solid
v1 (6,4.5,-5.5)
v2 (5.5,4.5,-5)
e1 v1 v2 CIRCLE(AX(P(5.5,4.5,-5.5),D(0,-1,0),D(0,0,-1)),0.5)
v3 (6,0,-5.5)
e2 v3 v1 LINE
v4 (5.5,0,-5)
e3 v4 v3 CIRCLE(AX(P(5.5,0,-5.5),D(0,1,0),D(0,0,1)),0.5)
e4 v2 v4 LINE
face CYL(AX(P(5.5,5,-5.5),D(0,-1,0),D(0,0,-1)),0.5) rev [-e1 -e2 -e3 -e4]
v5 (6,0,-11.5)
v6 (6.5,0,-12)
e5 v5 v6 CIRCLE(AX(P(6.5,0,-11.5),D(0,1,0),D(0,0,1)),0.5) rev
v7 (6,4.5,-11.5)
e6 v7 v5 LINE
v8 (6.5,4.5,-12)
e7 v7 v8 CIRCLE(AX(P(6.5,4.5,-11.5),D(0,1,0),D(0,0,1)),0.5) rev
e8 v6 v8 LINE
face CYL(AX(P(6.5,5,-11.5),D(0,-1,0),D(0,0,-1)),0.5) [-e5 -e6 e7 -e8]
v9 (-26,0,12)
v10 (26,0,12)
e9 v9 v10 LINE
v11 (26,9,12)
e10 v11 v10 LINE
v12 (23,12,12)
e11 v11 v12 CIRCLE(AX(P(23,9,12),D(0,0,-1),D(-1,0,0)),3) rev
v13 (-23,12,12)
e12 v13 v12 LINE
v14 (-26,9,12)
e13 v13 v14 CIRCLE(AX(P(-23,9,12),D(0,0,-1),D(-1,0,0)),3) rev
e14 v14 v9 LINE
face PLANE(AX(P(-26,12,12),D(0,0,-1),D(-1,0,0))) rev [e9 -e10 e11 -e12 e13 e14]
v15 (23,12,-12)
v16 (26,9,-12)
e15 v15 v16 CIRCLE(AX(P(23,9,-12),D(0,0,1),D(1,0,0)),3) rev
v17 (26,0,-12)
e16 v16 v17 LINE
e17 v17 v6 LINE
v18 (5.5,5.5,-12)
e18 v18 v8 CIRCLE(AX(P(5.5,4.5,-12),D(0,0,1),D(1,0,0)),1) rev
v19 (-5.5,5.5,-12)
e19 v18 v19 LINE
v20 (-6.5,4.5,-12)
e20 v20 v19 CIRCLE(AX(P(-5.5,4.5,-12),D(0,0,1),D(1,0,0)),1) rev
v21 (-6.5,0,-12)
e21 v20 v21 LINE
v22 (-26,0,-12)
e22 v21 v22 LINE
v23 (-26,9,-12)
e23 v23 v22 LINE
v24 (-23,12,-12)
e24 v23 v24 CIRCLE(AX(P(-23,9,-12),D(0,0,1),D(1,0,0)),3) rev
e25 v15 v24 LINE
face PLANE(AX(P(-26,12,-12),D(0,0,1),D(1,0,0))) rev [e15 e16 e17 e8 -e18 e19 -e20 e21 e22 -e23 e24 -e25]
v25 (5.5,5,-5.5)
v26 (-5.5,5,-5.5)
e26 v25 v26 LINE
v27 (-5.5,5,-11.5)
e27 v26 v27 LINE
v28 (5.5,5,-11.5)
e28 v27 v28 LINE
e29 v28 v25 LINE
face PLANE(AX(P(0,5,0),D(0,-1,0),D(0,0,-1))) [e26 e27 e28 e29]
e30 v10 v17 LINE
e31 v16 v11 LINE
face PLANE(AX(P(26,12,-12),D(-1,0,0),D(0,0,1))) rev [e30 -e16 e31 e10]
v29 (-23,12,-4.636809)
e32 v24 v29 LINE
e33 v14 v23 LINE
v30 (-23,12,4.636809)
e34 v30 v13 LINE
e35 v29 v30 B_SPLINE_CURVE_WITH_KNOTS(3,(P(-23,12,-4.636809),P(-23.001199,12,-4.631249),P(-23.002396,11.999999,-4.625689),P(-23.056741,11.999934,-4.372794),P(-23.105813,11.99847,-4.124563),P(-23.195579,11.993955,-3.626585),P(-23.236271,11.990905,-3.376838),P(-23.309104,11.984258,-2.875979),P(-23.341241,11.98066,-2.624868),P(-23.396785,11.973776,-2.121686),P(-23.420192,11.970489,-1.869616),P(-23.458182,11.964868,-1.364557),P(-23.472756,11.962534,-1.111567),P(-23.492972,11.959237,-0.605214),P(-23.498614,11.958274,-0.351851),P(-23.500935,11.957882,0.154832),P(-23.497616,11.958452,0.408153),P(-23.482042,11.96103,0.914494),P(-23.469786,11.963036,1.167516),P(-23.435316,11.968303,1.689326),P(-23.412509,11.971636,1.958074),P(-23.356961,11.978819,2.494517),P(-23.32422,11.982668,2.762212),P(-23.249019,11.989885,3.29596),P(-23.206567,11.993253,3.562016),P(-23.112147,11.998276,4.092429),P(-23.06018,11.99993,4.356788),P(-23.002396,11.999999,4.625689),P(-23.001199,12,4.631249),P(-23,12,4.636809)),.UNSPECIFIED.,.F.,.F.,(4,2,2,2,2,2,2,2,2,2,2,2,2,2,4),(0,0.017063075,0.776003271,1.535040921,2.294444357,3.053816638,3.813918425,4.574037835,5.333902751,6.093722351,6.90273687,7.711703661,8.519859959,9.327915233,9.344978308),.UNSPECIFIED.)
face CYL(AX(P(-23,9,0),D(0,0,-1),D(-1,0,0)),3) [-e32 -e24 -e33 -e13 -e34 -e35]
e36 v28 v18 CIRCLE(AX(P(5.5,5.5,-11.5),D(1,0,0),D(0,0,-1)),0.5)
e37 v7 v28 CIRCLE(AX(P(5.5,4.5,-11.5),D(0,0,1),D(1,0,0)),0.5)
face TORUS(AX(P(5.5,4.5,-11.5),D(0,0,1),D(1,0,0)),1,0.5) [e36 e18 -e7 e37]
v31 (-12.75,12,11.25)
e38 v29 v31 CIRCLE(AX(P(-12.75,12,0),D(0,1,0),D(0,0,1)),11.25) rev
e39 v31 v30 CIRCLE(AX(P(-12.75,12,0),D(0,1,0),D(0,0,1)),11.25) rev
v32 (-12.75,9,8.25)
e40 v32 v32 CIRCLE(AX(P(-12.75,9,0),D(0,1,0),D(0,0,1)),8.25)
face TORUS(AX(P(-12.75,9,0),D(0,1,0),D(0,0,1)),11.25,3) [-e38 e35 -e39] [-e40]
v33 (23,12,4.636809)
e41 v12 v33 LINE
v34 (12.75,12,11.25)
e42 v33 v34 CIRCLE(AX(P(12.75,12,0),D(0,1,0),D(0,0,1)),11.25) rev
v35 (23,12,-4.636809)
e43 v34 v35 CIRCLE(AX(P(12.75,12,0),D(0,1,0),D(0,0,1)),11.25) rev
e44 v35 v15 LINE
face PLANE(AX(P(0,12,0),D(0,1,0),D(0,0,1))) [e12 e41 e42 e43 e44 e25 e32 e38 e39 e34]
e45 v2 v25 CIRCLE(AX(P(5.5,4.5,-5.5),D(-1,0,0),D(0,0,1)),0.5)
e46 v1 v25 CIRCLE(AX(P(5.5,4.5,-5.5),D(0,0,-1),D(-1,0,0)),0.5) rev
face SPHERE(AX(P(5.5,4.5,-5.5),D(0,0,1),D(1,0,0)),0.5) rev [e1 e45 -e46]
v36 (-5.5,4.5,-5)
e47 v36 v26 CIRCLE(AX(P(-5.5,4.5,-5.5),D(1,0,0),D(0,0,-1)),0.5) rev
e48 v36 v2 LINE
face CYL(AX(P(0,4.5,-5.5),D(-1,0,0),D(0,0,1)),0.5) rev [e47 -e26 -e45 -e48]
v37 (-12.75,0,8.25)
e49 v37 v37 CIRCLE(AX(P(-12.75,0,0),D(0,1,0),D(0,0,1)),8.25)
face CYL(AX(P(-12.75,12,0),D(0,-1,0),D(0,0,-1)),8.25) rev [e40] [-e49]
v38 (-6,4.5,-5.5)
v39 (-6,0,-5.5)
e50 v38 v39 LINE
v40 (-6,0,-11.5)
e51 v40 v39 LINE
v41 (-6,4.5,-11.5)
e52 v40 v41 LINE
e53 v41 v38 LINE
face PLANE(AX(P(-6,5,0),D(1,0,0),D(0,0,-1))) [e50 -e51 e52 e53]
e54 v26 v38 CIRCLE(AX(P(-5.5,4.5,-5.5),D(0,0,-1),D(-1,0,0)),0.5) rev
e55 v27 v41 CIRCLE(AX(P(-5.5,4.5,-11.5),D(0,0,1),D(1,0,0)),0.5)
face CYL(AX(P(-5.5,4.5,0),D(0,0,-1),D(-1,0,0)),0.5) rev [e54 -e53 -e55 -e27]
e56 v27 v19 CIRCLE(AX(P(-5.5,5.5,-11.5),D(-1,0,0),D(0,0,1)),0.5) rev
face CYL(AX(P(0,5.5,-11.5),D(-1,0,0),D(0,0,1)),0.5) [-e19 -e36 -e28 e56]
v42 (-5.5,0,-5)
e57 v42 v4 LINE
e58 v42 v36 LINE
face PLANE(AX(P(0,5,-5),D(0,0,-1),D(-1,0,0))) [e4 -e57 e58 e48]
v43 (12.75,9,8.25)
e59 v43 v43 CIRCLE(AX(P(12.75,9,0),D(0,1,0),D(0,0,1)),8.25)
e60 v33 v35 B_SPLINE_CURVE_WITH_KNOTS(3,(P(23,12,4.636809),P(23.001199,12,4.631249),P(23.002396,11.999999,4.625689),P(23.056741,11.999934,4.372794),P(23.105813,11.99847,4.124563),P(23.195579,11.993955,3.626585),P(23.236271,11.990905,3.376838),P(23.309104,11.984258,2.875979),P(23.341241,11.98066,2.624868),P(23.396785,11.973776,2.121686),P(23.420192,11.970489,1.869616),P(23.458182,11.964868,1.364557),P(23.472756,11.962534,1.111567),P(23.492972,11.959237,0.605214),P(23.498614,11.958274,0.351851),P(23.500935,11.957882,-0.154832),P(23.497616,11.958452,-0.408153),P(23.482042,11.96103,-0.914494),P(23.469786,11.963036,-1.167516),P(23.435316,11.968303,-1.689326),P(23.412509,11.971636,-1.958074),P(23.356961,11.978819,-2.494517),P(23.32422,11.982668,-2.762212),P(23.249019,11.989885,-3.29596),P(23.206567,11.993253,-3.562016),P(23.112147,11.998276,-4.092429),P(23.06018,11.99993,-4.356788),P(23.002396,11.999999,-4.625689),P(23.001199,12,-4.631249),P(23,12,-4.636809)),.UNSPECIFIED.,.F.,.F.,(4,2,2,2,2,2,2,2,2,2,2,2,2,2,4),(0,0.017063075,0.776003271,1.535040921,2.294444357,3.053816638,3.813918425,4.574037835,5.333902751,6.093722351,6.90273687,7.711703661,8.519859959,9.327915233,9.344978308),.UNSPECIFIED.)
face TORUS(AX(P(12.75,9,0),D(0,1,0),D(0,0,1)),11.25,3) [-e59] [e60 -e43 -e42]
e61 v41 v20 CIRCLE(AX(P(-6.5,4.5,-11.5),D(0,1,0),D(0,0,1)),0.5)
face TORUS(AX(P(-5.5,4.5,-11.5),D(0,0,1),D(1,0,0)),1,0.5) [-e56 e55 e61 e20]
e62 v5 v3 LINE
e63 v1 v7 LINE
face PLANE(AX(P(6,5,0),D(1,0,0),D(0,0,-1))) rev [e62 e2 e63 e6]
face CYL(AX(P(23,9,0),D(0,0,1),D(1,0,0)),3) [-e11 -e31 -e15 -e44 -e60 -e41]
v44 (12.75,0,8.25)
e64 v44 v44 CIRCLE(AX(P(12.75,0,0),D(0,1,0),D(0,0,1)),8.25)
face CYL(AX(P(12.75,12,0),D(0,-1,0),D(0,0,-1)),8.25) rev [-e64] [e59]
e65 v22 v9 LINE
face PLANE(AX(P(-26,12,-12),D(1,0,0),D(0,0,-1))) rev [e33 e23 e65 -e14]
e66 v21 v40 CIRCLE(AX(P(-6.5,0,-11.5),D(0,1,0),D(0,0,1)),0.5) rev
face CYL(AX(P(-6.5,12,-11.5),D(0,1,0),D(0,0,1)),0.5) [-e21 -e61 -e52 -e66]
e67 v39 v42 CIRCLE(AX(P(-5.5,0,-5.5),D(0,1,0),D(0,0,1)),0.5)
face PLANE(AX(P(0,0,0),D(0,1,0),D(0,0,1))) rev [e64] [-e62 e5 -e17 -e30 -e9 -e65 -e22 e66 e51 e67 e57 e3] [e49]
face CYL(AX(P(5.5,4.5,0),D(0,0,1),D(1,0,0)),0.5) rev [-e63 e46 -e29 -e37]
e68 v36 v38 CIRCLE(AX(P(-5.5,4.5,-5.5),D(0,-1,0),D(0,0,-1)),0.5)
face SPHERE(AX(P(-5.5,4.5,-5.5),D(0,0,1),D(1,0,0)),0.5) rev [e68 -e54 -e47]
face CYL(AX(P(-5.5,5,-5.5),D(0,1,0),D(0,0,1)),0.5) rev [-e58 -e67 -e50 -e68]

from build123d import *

# Parameters (mm, degrees)
SKETCH1_W           = 52
SKETCH1_H           = 24
SKETCH1_R           = 8.25
BOSS_EXTRUDE1_DEPTH = 12
SKETCH2_R           = 1
CUT_EXTRUDE1_DEPTH  = 32.048349393
SKETCH3_R           = 1.75
CUT_EXTRUDE2_DEPTH  = 1
CUT_EXTRUDE3_DEPTH  = 5
FILLET2_R           = 0.5
SKETCH6_W           = 10
SKETCH6_H           = 10
SKETCH6_R           = 2
BOSS_EXTRUDE2_DEPTH = 5
FILLET3_R           = 4.6
FILLET4_R           = 3
SKETCH9_R           = 1.75
BOSS_EXTRUDE3_DEPTH = 12
SKETCH10_W          = 13.41545795
SKETCH10_H          = 24
SKETCH10_W_2        = 15.564044944
CUT_EXTRUDE4_DEPTH  = 39.587562763
FILLET5_R           = 3


with BuildPart() as part:
    # Sketch1 → Boss-Extrude1 (new body)
    with BuildSketch(Plane(origin=(0, 0, 0), x_dir=(1, 0, 0), z_dir=(0, 1, 0))):
        Rectangle(SKETCH1_W, SKETCH1_H)
        with Locations(Location((12.75, 0, 0), (0, 0, 270))):
            Circle(SKETCH1_R, mode=Mode.SUBTRACT)
        with Locations(Location((-12.75, 0, 0), (0, 0, 270))):
            Circle(SKETCH1_R, mode=Mode.SUBTRACT)
    extrude(amount=BOSS_EXTRUDE1_DEPTH)

    # Sketch2 → Cut-Extrude1 (cut, through all)
    with BuildSketch(Plane(origin=(0, 12, 0), x_dir=(1, 0, 0), z_dir=(0, 1, 0))):
        with Locations(Location((-21.35, 8.85, 0), (0, 0, 270))):
            Circle(SKETCH2_R)
        with Locations(Location((21.35, 8.85, 0), (0, 0, 270))):
            Circle(SKETCH2_R)
        with Locations(Location((21.35, -8.85, 0), (0, 0, 270))):
            Circle(SKETCH2_R)
        with Locations(Location((-21.35, -8.85, 0), (0, 0, 270))):
            Circle(SKETCH2_R)
    extrude(amount=-CUT_EXTRUDE1_DEPTH, mode=Mode.SUBTRACT)

    # Sketch3 → Cut-Extrude2 (cut)
    with BuildSketch(Plane(origin=(0, 12, 0), x_dir=(1, 0, 0), z_dir=(0, 1, 0))):
        with Locations(Location((-21.35, 8.85, 0), (0, 0, 270))):
            Circle(SKETCH3_R)
        with Locations(Location((21.35, 8.85, 0), (0, 0, 270))):
            Circle(SKETCH3_R)
        with Locations(Location((21.35, -8.85, 0), (0, 0, 270))):
            Circle(SKETCH3_R)
        with Locations(Location((-21.35, -8.85, 0), (0, 0, 270))):
            Circle(SKETCH3_R)
    extrude(amount=-CUT_EXTRUDE2_DEPTH, mode=Mode.SUBTRACT)

    # Sketch4 → Cut-Extrude3 (cut)
    with BuildSketch(Plane.XZ):
        Polygon((-6, -5), (-6, -12), (6, -12), (6, -5), (0, -5), align=None)
    extrude(amount=-CUT_EXTRUDE3_DEPTH, mode=Mode.SUBTRACT)

    # Fillet2
    fillet2_edges = [part.edges().sort_by_distance(p)[0] for p in [
        (0, 5, -12),
        (6, 2.5, -12),
        (-6, 2.5, -12),
        (-6, 2.5, -5),
        (6, 5, -8.5),
        (6, 2.5, -5),
        (-6, 5, -8.5),
        (0, 5, -5),
    ]]
    fillet(fillet2_edges, radius=FILLET2_R)

    # Sketch6 → Boss-Extrude2 (add)
    # profile 1 of 2: a face of its own
    with BuildSketch(Plane(origin=(0, 12, 0), x_dir=(1, 0, 0), z_dir=(0, 1, 0))):
        with Locations((-31, 0)):
            Rectangle(SKETCH6_W, SKETCH6_H)
        with Locations(Location((-31, 0, 0), (0, 0, 270))):
            Circle(SKETCH6_R, mode=Mode.SUBTRACT)
    # profile 2 of 2: a face of its own
    with BuildSketch(Plane(origin=(0, 12, 0), x_dir=(1, 0, 0), z_dir=(0, 1, 0))):
        with Locations((31, 0)):
            Rectangle(SKETCH6_W, SKETCH6_H)
        with Locations(Location((31, 0, 0), (0, 0, 90))):
            Circle(SKETCH6_R, mode=Mode.SUBTRACT)
    extrude(amount=-BOSS_EXTRUDE2_DEPTH)

    # Fillet3
    fillet3_edges = [part.edges().sort_by_distance(p)[0] for p in [
        (-26, 9.5, -5),
        (-26, 9.5, 5),
        (26, 9.5, -5),
        (26, 9.5, 5),
    ]]
    fillet(fillet3_edges, radius=FILLET3_R)

    # Fillet4
    fillet4_edges = [part.edges().sort_by_distance(p)[0] for p in [
        (-36, 9.5, 5),
        (-36, 9.5, -5),
        (36, 9.5, -5),
        (36, 9.5, 5),
    ]]
    fillet(fillet4_edges, radius=FILLET4_R)

    # Sketch9 → Boss-Extrude3 (add)
    with BuildSketch(Plane(origin=(0, 12, 0), x_dir=(1, 0, 0), z_dir=(0, 1, 0))):
        with Locations((-21.35, -8.85)):
            Circle(SKETCH9_R)
        with Locations((21.35, -8.85)):
            Circle(SKETCH9_R)
        with Locations((21.35, 8.85)):
            Circle(SKETCH9_R)
        with Locations((-21.35, 8.85)):
            Circle(SKETCH9_R)
    extrude(amount=-BOSS_EXTRUDE3_DEPTH)

    # Sketch10 → Cut-Extrude4 (cut, through all)
    with BuildSketch(Plane.XZ.offset(-7)):
        with Locations((-32.707728975, 0)):
            Rectangle(SKETCH10_W, SKETCH10_H)
        with Locations((33.782022472, 0)):
            Rectangle(SKETCH10_W_2, SKETCH10_H)
    extrude(amount=-CUT_EXTRUDE4_DEPTH, mode=Mode.SUBTRACT)

    # Fillet5
    # the kernel refuses this fillet: 3 mm, written as the material it takes off along each edge
    with BuildSketch(Plane(origin=(-26, 12, -19.5), x_dir=(1, 0, 0), z_dir=(0, 0, 1)), Plane(origin=(26, 12, 19.5), x_dir=(-1, 0, 0), z_dir=(0, 0, -1))) as fillet5_piece_1:
        with BuildLine():
            CenterArc((FILLET5_R, -FILLET5_R), FILLET5_R, 90, 90)
            Line((0, -FILLET5_R), (0, 0))
            Line((0, 0), (FILLET5_R, 0))
        make_face()
    extrude(amount=39, mode=Mode.SUBTRACT)
    with BuildSketch(Plane(origin=(12.75, 12, 0), x_dir=(0, 0, 1), z_dir=(-1, 0, 0))) as fillet5_piece_2:
        with BuildLine():
            CenterArc((8.25 + FILLET5_R, -FILLET5_R), FILLET5_R, 90, 90)
            Line((8.25, -FILLET5_R), (8.25, 0))
            Line((8.25, 0), (8.25 + FILLET5_R, 0))
        make_face()
    revolve(axis=Axis((12.75, 12, 0), (0, 1, 0)), mode=Mode.SUBTRACT)
    with BuildSketch(Plane(origin=(-12.75, 12, 0), x_dir=(0, 0, 1), z_dir=(-1, 0, 0))) as fillet5_piece_3:
        with BuildLine():
            CenterArc((8.25 + FILLET5_R, -FILLET5_R), FILLET5_R, 90, 90)
            Line((8.25, -FILLET5_R), (8.25, 0))
            Line((8.25, 0), (8.25 + FILLET5_R, 0))
        make_face()
    revolve(axis=Axis((-12.75, 12, 0), (0, 1, 0)), mode=Mode.SUBTRACT)


solid = part.part
